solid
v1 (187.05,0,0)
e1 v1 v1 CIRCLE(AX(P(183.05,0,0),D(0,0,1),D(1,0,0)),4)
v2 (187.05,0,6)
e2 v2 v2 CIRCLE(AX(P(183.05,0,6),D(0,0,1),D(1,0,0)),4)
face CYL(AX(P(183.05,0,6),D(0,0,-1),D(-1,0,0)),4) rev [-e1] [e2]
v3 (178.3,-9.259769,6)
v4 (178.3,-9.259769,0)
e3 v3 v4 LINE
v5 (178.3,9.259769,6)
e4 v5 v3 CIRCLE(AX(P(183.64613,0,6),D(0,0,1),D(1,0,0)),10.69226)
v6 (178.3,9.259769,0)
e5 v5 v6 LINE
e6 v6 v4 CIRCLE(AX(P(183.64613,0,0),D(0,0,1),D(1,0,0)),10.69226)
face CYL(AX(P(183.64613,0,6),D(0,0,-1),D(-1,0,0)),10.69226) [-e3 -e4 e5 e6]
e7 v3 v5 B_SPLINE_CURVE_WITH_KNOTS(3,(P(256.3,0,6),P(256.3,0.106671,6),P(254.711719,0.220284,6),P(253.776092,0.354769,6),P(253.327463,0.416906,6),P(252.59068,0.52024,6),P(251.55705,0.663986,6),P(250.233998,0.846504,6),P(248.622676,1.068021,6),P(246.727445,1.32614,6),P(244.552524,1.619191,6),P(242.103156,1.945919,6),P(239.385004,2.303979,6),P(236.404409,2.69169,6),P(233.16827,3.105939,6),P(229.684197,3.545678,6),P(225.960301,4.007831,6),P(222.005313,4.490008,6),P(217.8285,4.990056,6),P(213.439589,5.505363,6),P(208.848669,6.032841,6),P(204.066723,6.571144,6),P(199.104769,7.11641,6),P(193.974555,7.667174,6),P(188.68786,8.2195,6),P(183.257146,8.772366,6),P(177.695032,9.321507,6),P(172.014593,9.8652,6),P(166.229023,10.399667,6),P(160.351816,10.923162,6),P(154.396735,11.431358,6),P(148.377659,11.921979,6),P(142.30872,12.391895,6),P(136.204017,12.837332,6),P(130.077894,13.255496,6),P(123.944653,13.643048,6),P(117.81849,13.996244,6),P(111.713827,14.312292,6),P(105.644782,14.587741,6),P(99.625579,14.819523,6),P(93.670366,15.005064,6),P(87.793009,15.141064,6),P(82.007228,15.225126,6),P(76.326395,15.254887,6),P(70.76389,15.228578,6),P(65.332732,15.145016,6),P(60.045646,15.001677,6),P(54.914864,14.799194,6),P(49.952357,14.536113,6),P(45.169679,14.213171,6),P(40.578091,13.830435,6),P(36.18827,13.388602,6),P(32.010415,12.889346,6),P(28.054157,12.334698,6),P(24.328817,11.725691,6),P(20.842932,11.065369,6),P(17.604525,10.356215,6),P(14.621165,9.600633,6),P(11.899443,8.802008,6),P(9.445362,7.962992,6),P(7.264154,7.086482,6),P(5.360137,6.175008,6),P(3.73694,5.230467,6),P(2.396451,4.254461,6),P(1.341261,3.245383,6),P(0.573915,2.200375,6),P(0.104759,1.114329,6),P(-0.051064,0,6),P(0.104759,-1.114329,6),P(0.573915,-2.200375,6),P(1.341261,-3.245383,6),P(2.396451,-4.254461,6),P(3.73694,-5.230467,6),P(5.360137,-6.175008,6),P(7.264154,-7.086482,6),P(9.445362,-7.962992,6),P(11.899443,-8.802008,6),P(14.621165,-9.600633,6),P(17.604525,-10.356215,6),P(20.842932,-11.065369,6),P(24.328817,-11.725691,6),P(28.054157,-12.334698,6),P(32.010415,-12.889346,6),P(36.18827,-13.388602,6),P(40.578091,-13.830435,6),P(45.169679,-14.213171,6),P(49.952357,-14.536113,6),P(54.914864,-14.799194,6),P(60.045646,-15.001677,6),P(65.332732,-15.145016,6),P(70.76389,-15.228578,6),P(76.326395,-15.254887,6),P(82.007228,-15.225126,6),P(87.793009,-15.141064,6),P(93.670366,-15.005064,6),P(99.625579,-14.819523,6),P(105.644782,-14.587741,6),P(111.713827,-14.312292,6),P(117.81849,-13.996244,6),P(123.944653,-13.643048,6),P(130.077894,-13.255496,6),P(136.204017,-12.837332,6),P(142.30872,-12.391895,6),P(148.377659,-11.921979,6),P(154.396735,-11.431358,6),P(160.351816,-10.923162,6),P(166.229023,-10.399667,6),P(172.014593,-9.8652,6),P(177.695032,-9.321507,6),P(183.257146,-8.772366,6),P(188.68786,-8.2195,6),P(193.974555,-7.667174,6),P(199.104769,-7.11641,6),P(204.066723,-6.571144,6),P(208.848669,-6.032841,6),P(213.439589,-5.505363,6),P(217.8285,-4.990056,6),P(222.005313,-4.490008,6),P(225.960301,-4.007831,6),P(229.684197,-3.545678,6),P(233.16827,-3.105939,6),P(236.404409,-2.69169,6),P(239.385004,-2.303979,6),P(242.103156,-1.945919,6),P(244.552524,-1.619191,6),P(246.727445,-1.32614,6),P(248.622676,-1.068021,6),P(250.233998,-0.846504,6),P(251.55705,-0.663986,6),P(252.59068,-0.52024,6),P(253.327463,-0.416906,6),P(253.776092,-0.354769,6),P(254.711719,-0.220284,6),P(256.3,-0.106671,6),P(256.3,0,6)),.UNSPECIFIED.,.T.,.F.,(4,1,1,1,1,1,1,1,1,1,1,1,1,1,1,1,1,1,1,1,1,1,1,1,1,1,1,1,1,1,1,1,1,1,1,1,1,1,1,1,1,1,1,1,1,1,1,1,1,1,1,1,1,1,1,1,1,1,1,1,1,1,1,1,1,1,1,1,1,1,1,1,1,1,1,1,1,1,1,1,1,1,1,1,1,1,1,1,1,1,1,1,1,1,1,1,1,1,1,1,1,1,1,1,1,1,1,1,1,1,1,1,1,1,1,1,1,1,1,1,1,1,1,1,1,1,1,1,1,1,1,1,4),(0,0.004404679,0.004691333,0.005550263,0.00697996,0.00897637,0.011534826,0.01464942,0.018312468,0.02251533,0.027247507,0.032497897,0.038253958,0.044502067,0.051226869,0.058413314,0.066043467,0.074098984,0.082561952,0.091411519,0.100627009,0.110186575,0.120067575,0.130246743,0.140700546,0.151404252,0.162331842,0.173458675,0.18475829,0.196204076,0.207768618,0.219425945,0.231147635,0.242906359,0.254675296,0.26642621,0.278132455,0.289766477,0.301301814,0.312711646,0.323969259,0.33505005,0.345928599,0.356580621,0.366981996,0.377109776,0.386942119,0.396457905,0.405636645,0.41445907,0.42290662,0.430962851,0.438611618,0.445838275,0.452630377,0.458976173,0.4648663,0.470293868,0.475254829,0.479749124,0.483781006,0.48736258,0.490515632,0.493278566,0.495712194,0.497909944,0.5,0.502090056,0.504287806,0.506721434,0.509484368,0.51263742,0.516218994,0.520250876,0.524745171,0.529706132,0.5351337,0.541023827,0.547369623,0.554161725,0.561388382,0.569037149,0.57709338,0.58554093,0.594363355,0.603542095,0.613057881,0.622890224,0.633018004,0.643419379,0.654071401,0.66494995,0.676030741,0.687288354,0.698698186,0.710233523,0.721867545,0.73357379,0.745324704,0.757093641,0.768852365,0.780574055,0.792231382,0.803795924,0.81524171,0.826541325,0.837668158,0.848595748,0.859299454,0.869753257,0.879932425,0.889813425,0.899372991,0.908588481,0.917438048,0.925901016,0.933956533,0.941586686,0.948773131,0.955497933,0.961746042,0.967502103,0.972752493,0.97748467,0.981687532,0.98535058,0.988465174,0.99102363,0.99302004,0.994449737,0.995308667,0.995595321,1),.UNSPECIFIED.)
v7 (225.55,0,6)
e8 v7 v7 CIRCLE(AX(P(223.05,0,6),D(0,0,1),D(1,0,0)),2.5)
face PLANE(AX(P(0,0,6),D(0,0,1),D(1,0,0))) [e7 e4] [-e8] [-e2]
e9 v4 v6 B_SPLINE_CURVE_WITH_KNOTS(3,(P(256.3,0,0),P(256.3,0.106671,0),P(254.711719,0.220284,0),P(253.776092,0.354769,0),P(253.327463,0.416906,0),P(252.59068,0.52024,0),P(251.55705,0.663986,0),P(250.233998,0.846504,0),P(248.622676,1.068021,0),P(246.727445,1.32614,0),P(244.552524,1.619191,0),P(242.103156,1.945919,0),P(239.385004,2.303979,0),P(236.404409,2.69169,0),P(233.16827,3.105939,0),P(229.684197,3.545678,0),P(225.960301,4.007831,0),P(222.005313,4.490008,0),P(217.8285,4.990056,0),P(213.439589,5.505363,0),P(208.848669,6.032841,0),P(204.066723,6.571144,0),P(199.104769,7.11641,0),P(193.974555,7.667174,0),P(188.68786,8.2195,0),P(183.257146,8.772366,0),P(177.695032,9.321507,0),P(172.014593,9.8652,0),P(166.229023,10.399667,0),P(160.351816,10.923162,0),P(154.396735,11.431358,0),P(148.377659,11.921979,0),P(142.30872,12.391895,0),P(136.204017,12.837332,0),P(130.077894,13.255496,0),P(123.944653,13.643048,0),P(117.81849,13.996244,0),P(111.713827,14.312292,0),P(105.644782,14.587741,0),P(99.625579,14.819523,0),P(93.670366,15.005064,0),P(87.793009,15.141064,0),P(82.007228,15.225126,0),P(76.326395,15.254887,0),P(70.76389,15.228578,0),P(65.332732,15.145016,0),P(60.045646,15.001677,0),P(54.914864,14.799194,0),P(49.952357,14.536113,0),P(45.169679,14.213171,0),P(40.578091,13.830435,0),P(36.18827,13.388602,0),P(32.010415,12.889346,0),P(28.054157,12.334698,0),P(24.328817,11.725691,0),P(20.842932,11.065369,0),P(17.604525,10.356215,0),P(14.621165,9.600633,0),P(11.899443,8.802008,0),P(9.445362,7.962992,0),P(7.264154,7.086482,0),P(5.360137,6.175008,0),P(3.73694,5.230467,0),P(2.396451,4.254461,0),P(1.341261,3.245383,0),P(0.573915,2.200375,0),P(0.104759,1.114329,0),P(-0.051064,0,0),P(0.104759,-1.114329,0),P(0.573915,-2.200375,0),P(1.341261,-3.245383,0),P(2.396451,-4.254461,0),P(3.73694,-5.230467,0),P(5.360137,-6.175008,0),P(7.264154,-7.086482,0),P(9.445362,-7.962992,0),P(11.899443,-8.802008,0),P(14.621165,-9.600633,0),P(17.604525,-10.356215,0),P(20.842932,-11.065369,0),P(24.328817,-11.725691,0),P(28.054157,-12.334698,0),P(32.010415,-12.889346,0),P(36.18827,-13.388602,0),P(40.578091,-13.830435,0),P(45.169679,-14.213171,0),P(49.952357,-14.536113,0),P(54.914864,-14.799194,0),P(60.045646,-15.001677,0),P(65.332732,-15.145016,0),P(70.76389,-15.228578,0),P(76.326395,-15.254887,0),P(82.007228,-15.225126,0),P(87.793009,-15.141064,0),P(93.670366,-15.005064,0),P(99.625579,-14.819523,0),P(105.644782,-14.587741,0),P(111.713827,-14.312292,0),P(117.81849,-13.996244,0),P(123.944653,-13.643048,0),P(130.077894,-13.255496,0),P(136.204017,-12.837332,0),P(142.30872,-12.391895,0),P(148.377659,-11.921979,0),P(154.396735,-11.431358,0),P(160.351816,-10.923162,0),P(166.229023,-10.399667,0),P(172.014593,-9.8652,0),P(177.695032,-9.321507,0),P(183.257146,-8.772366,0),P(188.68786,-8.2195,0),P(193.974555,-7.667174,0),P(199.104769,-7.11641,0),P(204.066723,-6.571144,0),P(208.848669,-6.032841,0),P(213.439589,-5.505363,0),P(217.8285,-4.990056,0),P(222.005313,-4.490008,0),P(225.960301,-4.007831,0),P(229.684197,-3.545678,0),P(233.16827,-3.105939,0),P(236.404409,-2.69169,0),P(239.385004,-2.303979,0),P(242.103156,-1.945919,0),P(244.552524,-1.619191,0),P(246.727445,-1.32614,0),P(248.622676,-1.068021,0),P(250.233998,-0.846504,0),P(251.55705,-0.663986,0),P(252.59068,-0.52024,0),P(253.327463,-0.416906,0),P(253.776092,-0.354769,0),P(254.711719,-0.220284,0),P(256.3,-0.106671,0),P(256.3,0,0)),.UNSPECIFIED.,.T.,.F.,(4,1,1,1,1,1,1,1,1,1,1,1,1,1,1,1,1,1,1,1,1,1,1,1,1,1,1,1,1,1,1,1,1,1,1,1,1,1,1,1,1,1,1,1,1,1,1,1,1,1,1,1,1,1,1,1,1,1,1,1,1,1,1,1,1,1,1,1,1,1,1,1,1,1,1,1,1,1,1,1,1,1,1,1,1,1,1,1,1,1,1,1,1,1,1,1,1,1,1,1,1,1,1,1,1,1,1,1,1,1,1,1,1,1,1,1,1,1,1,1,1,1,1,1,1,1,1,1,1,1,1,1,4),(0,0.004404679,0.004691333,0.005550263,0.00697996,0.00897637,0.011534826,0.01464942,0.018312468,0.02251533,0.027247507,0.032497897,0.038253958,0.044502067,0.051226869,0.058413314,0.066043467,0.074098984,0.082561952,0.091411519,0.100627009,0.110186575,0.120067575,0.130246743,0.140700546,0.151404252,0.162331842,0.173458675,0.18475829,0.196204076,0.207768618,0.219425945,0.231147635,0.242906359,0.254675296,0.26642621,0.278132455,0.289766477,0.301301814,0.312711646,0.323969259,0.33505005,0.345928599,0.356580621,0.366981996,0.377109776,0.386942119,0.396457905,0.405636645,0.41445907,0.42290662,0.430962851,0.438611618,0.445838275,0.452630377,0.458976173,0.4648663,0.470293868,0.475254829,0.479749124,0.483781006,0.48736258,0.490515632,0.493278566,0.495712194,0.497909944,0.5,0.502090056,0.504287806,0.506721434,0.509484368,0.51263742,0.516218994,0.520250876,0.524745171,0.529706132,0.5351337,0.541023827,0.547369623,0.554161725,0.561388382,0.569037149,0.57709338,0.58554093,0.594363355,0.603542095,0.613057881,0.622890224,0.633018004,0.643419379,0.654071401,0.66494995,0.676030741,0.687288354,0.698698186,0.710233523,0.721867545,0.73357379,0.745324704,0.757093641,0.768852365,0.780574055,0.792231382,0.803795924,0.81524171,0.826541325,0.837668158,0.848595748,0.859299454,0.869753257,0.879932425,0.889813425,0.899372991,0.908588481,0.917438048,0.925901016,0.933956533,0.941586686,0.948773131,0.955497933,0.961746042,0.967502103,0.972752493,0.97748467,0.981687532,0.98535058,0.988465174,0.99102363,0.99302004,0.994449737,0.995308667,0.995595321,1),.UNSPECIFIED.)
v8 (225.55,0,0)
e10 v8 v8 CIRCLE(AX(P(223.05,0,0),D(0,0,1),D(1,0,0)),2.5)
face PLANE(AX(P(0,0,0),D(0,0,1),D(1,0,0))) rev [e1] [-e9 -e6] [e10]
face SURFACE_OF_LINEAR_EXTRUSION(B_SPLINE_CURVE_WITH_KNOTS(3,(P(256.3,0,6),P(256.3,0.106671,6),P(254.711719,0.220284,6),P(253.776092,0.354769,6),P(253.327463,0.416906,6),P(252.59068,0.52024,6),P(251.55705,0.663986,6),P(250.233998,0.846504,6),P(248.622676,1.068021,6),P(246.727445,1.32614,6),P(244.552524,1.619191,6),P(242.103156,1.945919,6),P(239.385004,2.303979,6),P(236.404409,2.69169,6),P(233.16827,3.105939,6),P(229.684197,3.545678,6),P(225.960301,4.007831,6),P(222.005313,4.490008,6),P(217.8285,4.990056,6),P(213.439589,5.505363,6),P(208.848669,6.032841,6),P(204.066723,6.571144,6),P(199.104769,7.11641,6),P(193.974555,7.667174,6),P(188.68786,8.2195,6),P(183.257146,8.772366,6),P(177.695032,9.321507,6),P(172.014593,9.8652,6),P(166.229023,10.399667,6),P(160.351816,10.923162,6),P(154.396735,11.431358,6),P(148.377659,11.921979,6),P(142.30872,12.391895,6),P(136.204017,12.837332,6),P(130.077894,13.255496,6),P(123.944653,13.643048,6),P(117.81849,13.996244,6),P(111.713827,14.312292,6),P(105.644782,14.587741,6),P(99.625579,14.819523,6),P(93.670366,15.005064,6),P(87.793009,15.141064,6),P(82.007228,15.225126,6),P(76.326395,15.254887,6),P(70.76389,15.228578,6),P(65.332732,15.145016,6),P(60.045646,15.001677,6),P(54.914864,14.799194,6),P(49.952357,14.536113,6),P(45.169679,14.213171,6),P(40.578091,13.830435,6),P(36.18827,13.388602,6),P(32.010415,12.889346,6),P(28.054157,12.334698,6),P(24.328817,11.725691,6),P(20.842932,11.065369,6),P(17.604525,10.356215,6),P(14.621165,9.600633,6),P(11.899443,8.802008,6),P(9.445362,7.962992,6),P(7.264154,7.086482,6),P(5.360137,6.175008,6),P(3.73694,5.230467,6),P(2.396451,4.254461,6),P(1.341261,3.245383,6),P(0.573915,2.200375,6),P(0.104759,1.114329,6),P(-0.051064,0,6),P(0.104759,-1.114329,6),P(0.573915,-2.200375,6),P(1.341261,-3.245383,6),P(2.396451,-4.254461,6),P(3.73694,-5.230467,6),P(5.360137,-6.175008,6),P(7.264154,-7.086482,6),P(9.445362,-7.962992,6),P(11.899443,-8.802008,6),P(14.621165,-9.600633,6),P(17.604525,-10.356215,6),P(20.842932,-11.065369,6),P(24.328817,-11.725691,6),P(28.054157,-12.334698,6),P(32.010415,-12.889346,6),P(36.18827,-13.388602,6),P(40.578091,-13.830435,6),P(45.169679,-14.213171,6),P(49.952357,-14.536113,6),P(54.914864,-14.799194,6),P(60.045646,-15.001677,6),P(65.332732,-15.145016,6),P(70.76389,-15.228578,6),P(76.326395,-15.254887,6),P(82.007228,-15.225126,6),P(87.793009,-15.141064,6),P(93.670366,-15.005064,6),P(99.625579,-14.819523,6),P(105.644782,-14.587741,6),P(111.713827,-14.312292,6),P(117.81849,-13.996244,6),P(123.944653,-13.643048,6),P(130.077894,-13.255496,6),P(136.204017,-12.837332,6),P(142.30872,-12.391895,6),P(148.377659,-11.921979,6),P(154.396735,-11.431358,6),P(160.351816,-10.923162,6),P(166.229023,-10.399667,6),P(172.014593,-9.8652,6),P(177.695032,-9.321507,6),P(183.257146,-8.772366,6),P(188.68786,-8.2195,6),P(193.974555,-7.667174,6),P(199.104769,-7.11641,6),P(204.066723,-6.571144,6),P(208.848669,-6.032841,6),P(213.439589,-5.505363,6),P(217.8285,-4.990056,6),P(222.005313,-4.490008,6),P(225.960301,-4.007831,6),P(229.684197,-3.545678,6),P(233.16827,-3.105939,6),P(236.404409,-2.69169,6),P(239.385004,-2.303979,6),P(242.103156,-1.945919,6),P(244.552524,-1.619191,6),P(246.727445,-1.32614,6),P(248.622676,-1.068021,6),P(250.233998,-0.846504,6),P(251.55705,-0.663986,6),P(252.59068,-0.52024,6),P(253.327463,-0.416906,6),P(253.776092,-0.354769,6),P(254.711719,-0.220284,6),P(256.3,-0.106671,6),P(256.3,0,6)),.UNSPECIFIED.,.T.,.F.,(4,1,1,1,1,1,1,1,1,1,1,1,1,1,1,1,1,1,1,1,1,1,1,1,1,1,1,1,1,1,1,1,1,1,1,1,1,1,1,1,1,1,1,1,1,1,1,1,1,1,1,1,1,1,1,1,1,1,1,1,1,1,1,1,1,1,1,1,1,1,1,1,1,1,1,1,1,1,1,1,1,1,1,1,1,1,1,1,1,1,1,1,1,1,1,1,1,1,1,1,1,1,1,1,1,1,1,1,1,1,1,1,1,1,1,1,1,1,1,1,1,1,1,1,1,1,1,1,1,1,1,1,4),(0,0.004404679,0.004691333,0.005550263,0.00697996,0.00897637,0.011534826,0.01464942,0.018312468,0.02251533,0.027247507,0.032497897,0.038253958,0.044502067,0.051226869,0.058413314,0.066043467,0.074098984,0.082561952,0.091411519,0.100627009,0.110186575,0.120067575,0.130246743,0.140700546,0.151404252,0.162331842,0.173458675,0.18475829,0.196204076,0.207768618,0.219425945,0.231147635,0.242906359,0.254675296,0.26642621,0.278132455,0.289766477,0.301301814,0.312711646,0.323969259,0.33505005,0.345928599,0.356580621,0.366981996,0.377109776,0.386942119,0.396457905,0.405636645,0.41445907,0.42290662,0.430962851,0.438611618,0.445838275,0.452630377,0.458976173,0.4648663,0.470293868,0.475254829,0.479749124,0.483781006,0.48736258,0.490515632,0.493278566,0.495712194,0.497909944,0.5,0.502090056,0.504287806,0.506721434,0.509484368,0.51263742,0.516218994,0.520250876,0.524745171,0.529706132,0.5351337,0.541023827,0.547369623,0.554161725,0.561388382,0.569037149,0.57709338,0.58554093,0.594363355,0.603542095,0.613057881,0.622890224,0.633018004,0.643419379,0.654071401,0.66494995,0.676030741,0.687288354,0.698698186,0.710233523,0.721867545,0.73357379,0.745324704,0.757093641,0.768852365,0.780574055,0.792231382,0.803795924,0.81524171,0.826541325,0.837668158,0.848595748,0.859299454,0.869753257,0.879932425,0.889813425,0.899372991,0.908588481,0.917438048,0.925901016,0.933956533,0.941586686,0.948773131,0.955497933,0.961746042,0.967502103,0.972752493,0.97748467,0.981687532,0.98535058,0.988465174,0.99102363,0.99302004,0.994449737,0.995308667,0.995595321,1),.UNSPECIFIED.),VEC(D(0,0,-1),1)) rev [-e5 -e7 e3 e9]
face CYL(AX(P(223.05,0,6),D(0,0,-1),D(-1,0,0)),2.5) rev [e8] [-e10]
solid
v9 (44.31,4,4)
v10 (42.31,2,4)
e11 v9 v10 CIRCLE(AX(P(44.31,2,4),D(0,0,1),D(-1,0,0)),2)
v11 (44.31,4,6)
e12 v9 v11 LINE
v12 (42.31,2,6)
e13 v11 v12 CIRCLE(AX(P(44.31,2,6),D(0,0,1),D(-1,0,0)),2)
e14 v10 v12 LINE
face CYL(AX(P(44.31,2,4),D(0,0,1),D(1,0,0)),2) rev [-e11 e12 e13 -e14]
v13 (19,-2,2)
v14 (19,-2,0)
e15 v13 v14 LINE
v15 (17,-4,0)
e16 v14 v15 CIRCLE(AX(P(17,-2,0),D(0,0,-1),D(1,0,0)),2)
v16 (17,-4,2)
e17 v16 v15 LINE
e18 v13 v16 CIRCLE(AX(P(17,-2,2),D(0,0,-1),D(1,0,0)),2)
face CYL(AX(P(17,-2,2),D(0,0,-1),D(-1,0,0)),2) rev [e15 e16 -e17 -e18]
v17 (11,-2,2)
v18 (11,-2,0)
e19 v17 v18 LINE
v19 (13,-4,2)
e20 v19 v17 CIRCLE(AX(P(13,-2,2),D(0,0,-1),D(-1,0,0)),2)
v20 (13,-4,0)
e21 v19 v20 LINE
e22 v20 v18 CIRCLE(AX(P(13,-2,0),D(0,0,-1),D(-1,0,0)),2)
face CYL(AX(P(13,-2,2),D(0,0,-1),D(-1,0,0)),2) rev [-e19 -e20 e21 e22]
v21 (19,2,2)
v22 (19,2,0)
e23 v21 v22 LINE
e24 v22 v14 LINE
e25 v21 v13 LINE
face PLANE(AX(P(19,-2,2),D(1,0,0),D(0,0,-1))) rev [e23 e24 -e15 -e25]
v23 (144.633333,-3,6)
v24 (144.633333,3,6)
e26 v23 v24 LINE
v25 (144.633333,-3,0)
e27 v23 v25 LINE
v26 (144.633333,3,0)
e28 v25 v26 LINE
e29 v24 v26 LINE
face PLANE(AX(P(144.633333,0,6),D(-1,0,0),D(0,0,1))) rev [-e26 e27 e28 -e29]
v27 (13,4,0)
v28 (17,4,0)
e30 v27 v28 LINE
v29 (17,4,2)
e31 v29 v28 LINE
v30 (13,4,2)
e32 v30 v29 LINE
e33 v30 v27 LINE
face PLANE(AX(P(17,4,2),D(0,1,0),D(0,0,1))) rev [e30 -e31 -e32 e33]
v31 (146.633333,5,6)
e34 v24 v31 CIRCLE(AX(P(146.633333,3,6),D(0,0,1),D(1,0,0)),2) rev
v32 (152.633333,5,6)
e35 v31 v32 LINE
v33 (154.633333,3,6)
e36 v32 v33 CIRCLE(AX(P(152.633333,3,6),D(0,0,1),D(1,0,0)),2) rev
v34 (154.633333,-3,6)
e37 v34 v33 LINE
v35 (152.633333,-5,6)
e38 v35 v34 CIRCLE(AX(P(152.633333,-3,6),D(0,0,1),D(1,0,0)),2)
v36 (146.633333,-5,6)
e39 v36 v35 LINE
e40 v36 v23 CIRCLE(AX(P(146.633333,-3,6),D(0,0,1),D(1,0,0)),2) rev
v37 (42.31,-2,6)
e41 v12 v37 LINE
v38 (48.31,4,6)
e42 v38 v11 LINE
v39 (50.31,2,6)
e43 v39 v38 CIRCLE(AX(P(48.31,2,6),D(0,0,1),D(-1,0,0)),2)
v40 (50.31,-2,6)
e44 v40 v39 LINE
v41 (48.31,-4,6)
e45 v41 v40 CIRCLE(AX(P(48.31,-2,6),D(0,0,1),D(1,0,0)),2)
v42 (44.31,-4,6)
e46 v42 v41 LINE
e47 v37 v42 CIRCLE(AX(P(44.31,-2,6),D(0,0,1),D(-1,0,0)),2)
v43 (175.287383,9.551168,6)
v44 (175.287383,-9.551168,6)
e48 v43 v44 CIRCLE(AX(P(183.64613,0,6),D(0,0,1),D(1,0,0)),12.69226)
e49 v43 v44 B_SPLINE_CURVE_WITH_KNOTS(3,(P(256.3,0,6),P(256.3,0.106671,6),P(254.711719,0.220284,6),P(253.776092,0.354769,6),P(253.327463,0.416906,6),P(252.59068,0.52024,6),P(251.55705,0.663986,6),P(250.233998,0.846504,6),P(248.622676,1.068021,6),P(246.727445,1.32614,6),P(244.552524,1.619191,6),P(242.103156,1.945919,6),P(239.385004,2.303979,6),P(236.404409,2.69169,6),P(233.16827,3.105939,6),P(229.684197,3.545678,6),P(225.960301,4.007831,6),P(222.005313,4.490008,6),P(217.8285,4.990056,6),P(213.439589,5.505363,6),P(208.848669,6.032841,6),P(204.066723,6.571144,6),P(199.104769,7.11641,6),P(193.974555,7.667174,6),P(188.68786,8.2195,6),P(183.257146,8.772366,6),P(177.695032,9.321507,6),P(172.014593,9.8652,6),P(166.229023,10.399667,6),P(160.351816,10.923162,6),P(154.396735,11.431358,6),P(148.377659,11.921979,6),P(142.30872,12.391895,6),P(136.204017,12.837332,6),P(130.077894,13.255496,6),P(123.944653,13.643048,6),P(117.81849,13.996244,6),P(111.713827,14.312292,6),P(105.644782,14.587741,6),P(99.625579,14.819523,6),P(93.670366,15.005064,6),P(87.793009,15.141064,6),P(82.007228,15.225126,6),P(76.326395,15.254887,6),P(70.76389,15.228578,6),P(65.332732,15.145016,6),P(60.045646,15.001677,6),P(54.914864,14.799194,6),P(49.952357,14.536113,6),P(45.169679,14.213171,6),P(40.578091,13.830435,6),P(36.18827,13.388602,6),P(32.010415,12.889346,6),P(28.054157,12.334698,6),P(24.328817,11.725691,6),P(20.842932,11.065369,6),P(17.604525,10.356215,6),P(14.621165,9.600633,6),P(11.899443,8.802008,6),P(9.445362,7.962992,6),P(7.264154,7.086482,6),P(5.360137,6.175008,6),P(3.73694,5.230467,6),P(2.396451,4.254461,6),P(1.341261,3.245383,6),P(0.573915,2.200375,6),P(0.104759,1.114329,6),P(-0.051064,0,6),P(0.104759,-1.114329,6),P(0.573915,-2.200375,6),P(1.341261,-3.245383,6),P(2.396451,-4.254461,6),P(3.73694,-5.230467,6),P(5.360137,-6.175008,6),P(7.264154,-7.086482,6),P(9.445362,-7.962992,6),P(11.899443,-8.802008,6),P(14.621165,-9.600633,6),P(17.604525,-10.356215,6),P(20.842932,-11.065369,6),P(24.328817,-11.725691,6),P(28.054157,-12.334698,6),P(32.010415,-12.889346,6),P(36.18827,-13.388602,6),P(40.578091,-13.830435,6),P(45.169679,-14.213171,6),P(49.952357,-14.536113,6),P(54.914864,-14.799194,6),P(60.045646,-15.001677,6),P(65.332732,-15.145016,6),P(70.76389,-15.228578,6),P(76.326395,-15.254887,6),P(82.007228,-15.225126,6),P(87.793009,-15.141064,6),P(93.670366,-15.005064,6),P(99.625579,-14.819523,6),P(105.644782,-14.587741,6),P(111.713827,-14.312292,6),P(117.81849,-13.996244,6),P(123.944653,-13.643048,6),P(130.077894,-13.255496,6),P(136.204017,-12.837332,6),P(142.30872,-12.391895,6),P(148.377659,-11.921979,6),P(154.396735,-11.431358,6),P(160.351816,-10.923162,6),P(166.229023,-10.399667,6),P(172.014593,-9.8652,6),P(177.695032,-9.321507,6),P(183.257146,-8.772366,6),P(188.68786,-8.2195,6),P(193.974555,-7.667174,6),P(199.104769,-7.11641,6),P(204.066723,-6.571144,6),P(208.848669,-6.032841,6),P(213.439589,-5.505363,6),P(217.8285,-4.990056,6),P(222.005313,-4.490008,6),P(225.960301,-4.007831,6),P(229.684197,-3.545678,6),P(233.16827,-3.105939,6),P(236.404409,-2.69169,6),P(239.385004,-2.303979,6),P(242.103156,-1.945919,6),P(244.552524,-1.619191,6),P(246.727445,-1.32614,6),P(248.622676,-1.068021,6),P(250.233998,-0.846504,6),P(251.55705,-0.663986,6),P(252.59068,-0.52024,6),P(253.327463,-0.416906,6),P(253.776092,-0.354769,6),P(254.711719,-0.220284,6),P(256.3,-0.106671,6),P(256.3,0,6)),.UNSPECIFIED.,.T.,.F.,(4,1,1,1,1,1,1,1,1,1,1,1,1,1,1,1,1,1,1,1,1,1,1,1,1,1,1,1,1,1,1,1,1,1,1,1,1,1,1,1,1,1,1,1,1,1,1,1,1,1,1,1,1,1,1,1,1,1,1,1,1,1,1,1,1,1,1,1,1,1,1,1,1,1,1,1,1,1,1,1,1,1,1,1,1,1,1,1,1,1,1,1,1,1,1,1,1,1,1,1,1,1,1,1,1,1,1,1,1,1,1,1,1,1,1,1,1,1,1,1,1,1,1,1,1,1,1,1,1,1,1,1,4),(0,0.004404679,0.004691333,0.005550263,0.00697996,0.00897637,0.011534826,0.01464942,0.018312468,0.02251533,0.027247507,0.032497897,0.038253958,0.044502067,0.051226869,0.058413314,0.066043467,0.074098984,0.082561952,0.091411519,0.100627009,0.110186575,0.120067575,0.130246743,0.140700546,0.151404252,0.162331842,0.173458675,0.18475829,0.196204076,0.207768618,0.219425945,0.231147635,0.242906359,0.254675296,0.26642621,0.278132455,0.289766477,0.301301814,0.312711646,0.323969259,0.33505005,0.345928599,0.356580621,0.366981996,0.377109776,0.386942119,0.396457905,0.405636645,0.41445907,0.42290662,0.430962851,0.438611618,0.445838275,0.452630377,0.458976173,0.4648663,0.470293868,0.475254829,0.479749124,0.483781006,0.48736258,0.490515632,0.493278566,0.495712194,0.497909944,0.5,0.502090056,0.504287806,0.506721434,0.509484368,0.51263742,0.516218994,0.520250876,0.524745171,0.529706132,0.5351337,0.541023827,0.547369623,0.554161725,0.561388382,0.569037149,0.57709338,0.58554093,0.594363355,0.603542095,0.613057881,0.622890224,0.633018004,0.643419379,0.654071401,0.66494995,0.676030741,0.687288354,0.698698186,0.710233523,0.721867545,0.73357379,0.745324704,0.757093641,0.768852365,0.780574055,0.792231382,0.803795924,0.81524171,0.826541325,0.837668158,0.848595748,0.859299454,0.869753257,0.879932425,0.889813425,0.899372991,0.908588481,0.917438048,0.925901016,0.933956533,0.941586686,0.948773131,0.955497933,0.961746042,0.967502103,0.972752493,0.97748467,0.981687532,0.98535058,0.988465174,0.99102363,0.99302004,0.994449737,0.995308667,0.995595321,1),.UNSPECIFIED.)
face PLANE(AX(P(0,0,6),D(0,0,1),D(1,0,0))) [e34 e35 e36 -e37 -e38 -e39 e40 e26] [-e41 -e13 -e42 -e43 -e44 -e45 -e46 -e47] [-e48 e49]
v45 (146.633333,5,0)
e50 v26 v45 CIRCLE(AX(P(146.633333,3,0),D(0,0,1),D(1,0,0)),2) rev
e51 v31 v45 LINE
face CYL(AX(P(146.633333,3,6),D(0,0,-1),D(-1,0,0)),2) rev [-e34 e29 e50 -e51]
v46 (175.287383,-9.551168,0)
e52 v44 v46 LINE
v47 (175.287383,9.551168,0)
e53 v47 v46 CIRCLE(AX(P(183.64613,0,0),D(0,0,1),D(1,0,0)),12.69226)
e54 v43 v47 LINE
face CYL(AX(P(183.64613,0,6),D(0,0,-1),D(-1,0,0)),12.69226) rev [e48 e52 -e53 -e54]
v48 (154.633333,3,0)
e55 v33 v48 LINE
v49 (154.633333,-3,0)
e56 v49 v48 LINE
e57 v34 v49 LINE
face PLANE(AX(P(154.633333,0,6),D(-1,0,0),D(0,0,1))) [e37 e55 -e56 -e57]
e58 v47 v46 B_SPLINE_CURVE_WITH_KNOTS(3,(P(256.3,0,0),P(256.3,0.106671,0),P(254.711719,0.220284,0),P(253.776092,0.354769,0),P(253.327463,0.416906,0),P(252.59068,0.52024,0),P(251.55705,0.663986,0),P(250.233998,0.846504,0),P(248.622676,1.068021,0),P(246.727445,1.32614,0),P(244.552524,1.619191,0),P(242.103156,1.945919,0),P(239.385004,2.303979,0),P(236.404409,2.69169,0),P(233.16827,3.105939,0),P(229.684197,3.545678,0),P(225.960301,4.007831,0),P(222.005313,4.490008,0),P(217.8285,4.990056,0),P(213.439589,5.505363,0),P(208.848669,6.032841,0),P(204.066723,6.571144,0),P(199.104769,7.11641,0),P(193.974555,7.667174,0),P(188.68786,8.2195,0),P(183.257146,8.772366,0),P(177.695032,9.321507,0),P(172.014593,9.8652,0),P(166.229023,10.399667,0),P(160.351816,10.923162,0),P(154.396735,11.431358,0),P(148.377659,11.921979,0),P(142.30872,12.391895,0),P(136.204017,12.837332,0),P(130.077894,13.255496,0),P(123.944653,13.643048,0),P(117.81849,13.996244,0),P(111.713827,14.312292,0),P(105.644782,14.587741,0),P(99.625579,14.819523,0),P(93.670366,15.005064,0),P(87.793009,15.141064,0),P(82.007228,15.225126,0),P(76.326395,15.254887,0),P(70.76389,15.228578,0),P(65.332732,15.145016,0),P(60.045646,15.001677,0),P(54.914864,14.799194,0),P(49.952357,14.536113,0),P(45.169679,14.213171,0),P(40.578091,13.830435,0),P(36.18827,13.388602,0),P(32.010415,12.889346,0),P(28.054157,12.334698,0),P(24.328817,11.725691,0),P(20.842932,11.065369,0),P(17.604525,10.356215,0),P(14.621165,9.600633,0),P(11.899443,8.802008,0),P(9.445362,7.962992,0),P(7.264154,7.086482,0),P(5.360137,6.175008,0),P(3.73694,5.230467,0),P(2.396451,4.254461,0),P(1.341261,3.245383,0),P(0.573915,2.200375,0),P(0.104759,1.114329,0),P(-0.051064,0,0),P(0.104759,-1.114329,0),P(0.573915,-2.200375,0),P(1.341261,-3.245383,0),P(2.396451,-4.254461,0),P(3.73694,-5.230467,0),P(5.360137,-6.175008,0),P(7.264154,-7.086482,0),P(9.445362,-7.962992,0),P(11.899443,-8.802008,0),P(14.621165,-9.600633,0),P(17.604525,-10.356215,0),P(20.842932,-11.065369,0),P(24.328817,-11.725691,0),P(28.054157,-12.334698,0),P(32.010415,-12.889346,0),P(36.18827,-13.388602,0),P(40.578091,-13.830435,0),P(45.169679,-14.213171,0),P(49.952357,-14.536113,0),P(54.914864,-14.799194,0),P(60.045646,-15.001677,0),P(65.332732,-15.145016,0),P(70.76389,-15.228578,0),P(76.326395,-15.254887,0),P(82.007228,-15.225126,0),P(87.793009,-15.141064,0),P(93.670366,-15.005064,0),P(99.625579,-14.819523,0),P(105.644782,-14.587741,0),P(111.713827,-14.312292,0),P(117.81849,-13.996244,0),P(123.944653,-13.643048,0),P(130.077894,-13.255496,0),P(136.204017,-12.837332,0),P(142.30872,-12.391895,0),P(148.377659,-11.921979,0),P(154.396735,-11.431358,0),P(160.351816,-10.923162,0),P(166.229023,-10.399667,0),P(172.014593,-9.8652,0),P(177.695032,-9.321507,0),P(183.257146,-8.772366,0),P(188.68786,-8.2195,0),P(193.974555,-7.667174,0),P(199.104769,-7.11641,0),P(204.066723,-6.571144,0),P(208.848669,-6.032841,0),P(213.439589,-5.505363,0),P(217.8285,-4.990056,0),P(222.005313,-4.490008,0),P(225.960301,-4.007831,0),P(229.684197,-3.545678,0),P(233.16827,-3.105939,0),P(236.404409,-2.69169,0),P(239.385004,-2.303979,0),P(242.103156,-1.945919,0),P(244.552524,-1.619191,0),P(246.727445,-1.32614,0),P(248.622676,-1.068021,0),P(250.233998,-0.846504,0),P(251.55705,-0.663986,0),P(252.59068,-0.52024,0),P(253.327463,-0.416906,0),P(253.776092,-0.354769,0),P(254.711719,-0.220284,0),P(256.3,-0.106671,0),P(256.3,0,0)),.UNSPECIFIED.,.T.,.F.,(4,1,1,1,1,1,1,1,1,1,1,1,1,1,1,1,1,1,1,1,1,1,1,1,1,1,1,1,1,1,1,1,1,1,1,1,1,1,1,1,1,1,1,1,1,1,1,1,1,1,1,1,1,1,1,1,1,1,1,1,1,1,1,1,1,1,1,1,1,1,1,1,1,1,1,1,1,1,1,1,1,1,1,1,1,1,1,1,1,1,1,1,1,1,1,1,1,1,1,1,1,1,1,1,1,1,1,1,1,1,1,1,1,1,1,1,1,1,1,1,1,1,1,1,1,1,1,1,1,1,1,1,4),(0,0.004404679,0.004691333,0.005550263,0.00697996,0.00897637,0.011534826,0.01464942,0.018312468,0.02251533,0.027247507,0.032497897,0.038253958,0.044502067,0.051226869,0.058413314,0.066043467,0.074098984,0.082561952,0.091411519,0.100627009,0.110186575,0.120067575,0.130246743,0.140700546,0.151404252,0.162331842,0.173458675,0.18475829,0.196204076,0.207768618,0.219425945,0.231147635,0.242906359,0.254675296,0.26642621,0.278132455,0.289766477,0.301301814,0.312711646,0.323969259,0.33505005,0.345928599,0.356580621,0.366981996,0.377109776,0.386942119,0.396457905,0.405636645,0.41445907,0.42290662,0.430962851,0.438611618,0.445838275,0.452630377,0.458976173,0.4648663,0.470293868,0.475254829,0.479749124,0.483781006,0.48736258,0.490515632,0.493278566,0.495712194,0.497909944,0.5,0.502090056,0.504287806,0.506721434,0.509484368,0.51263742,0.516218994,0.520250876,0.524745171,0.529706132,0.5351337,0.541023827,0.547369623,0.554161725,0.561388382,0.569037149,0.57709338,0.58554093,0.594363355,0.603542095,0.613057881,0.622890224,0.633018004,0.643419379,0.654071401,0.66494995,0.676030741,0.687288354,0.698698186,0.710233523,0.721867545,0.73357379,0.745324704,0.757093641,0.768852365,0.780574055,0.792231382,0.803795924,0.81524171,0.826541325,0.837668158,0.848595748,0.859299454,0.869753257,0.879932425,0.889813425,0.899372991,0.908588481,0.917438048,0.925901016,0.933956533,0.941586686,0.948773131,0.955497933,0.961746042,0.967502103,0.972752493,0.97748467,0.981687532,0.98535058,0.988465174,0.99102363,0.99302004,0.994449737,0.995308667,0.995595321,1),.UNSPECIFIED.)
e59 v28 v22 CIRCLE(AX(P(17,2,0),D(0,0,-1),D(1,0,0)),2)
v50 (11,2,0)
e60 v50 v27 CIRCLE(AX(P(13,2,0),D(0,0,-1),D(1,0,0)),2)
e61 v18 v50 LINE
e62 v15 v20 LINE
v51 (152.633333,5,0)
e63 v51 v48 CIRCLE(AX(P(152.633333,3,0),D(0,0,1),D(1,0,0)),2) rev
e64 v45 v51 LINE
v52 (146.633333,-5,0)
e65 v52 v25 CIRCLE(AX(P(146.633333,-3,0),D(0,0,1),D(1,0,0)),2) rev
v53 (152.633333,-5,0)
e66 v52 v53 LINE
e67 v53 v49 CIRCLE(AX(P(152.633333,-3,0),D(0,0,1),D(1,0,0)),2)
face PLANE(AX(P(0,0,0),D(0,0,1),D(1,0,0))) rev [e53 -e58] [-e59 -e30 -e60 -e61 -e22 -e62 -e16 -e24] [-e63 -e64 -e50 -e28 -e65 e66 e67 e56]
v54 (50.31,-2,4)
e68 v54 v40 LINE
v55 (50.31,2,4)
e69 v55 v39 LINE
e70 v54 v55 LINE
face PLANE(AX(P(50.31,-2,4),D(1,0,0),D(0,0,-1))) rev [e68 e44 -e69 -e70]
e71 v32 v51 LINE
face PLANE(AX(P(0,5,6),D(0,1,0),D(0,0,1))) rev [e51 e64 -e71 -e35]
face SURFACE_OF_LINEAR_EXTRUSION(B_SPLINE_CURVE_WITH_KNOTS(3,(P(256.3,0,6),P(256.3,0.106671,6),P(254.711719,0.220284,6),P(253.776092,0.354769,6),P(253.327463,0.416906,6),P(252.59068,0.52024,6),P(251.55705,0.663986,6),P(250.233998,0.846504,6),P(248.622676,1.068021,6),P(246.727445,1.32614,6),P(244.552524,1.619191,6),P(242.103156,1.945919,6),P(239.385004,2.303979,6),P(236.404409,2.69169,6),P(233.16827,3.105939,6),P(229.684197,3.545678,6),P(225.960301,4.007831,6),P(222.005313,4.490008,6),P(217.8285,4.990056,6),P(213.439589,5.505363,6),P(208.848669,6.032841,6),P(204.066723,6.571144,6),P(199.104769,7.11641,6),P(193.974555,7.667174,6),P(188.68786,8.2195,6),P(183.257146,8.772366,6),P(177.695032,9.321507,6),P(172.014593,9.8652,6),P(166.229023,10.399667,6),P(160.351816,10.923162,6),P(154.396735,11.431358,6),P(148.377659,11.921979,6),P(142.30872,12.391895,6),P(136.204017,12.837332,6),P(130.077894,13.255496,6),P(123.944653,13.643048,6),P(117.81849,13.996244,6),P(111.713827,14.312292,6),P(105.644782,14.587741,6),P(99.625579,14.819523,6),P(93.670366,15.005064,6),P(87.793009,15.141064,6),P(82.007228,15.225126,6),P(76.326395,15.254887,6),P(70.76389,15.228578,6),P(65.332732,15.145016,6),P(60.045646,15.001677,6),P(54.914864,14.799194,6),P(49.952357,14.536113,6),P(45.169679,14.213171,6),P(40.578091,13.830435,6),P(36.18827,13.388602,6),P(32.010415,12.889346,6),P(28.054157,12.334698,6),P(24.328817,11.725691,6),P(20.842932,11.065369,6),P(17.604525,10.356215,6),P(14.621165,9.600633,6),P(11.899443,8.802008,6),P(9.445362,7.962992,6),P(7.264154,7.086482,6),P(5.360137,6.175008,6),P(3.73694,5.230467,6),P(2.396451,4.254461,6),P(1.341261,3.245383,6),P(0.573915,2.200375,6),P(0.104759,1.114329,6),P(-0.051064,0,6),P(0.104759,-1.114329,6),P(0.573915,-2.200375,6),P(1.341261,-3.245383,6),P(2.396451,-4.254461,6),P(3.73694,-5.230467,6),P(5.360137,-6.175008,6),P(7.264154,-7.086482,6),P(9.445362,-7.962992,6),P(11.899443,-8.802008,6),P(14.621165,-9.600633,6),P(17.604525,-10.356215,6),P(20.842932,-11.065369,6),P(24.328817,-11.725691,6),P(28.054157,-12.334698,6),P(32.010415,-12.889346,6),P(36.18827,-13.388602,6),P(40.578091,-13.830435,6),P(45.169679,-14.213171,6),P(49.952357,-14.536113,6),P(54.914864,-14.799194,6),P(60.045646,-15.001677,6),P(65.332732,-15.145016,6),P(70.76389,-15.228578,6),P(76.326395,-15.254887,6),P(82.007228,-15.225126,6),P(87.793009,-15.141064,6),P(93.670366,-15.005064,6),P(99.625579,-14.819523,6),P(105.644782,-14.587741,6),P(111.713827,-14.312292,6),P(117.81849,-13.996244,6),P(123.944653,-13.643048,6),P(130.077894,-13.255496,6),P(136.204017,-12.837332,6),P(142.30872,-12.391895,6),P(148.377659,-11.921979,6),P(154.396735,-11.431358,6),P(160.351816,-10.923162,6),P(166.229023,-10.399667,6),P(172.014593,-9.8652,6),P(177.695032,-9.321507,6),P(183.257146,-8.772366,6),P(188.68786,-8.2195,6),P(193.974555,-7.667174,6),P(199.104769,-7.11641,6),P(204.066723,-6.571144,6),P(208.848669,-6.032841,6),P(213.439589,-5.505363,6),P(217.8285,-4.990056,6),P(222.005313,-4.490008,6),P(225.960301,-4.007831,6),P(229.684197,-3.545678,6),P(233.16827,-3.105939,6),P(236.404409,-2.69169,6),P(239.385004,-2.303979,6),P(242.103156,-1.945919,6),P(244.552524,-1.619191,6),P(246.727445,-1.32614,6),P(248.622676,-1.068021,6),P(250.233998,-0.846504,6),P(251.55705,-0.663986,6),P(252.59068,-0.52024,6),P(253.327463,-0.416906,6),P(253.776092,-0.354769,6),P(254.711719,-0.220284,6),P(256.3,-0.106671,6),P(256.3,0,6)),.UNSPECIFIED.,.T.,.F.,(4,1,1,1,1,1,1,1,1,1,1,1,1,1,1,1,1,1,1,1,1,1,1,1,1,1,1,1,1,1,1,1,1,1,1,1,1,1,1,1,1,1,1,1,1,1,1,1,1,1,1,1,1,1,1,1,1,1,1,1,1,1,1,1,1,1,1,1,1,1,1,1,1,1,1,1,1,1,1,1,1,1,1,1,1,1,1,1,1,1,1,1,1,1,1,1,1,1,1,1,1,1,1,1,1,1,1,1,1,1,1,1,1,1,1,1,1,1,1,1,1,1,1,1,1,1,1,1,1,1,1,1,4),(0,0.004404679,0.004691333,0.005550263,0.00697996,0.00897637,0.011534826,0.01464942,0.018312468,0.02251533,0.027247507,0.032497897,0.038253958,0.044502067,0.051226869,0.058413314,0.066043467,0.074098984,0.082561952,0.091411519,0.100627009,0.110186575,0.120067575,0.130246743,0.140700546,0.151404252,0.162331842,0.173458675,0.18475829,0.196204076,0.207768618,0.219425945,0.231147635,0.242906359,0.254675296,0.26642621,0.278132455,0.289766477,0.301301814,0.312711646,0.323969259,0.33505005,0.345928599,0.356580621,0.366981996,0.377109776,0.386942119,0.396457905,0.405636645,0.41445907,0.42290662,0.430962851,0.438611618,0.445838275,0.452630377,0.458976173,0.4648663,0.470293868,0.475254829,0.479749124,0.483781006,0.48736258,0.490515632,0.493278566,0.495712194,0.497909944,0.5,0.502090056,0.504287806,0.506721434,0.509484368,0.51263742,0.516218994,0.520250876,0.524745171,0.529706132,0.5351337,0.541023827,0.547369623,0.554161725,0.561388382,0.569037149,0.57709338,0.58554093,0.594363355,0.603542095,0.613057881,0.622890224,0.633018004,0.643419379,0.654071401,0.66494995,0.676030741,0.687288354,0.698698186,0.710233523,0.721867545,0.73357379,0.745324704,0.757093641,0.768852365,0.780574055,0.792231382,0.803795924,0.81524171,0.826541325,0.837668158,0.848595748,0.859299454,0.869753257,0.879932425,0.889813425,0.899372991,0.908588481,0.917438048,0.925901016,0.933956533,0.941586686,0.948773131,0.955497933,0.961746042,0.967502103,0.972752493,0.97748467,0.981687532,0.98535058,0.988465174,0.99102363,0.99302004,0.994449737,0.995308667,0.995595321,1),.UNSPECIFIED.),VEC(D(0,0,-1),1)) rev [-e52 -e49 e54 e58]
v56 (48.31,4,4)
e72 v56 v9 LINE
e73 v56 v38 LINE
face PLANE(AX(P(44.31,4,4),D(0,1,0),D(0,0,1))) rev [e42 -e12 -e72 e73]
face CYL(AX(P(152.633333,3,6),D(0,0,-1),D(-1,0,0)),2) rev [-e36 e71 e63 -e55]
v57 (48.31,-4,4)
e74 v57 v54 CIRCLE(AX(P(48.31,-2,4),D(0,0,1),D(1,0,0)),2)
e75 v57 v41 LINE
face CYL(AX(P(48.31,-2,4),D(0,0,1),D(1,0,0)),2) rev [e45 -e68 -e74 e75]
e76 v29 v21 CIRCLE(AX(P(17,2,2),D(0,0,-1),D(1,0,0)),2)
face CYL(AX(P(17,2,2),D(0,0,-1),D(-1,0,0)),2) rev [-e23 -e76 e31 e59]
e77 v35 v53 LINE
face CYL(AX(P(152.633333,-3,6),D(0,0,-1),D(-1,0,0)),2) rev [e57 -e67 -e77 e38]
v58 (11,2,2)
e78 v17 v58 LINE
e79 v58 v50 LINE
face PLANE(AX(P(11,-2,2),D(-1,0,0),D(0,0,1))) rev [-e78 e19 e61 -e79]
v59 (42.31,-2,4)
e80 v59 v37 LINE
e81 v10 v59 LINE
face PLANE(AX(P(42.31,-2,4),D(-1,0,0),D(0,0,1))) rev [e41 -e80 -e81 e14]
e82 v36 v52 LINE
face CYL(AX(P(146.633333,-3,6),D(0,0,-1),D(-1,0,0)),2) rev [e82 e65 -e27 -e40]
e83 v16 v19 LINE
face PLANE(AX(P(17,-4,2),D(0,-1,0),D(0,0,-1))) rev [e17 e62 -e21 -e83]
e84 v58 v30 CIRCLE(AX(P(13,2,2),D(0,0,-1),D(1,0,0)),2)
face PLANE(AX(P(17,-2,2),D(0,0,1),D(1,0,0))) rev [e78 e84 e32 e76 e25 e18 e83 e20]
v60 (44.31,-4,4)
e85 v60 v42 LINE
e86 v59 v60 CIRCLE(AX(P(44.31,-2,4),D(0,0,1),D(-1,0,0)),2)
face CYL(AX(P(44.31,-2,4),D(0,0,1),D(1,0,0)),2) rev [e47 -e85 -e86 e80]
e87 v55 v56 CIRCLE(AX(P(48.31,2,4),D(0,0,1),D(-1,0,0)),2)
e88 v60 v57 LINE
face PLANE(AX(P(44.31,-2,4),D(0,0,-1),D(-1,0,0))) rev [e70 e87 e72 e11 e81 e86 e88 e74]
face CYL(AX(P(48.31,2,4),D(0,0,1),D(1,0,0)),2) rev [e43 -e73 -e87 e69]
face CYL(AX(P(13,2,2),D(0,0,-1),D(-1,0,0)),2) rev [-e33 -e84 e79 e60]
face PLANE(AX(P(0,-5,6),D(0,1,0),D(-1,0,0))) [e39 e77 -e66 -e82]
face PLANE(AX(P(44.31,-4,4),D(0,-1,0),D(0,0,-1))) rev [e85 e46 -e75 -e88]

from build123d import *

# Parameters (mm, degrees)
RESSALTO_EXTRUS_O1_OUTLINE_R   = 4
RESSALTO_EXTRUS_O1_OUTLINE_R_2 = 2.5
RESSALTO_EXTRUS_O1_DEPTH       = 6
CORTE_EXTRUS_O1_DEPTH          = 2
CORTE_EXTRUS_O2_DEPTH          = 2


# Read off the part's stored shape, not the designer's step: Ressalto-extrusão1
with BuildPart() as part:
    # Ressalto-extrusão1 outline → Ressalto-extrusão1 (new body)
    # profile 1 of 2: a face of its own
    with BuildSketch(Plane.XY):
        with BuildLine():
            ThreePointArc((178.3, 9.259768845), (172.953869965, 0), (178.3, -9.259768845))
            add(Edge.make_bspline(
                [(178.3, -9.259768845), (179.966948912, -9.097173464), (183.445872321, -8.753152805), (188.68785969, -8.21950013), (193.974554518, -7.66717356), (199.104769106, -7.11640957), (204.066722569, -6.571144014), (208.848668706, -6.032841378), (213.439589199, -5.505363168), (217.828500467, -4.990056498), (222.005313283, -4.490008279), (225.960300672, -4.007831381), (229.68419663, -3.545678166), (233.168269855, -3.105938896), (236.40440925, -2.691690119), (239.385003595, -2.303979488), (242.103156271, -1.945919059), (244.552524456, -1.619190737), (246.727445017, -1.32614033), (248.622675623, -1.068020882), (250.233997703, -0.846504296), (251.557050419, -0.663986384), (252.590679655, -0.520240199), (253.327462597, -0.416906365), (253.776091936, -0.354769376), (254.711719333, -0.220284067), (256.3, -0.106670993), (256.3, 0), (256.3, 0.106670993), (254.711719333, 0.220284067), (253.776091936, 0.354769376), (253.327462597, 0.416906365), (252.590679655, 0.520240199), (251.557050419, 0.663986384), (250.233997703, 0.846504296), (248.622675623, 1.068020882), (246.727445017, 1.32614033), (244.552524456, 1.619190737), (242.103156271, 1.945919059), (239.385003595, 2.303979488), (236.40440925, 2.691690119), (233.168269855, 3.105938896), (229.68419663, 3.545678166), (225.960300672, 4.007831381), (222.005313283, 4.490008279), (217.828500467, 4.990056498), (213.439589199, 5.505363168), (208.848668706, 6.032841378), (204.066722569, 6.571144014), (199.104769106, 7.11640957), (193.974554518, 7.66717356), (188.68785969, 8.21950013), (183.445872321, 8.753152805), (179.966948912, 9.097173464), (178.3, 9.259768845)],
                knots=[0.849684747, 0.849684747, 0.849684747, 0.849684747, 0.859299454, 0.869753257, 0.879932425, 0.889813425, 0.899372991, 0.908588481, 0.917438048, 0.925901016, 0.933956533, 0.941586686, 0.948773131, 0.955497933, 0.961746042, 0.967502103, 0.972752493, 0.97748467, 0.981687532, 0.98535058, 0.988465174, 0.99102363, 0.99302004, 0.994449737, 0.995308667, 0.995595321, 1, 1, 1, 1.004404679, 1.004691333, 1.005550263, 1.00697996, 1.00897637, 1.011534826, 1.01464942, 1.018312468, 1.02251533, 1.027247507, 1.032497897, 1.038253958, 1.044502067, 1.051226869, 1.058413314, 1.066043467, 1.074098984, 1.082561952, 1.091411519, 1.100627009, 1.110186575, 1.120067575, 1.130246743, 1.140700546, 1.150315253, 1.150315253, 1.150315253, 1.150315253], degree=3))
        make_face()
        with Locations((183.05, 0)):
            Circle(RESSALTO_EXTRUS_O1_OUTLINE_R, mode=Mode.SUBTRACT)
        with Locations((223.05, 0)):
            Circle(RESSALTO_EXTRUS_O1_OUTLINE_R_2, mode=Mode.SUBTRACT)
    # profile 2 of 2: a face of its own
    with BuildSketch(Plane.XY):
        with BuildLine():
            add(Edge.make_bspline(
                [(175.287382607, 9.551167841), (174.207965209, 9.654685452), (171.198874041, 9.940555484), (166.229022592, 10.399667358), (160.351815772, 10.923162493), (154.396735285, 11.431357512), (148.377658827, 11.921979348), (142.308720286, 12.391894821), (136.204016556, 12.837331642), (130.077893929, 13.255496113), (123.944653006, 13.643047983), (117.818490267, 13.996244432), (111.713827177, 14.312292337), (105.64478211, 14.587741364), (99.625579188, 14.819523055), (93.670366494, 15.005064191), (87.793008994, 15.141064398), (82.007227866, 15.225126103), (76.326395242, 15.254886657), (70.763890367, 15.22857762), (65.332731596, 15.145016118), (60.045645868, 15.001676848), (54.914863551, 14.79919411), (49.952356648, 14.536113044), (45.169678516, 14.213170989), (40.57809127, 13.830435299), (36.188270081, 13.388601619), (32.010414838, 12.889346003), (28.054157141, 12.334697787), (24.328816977, 11.725690904), (20.842932132, 11.065369069), (17.604525309, 10.356215177), (14.621164931, 9.600633189), (11.899443292, 8.802008), (9.445361787, 7.962991828), (7.264153877, 7.086482459), (5.360137362, 6.175008453), (3.736939642, 5.230467455), (2.396450862, 4.254460648), (1.341261213, 3.245382554), (0.573915311, 2.200374626), (0.104758816, 1.114328986), (-0.051063833, 0), (0.104758816, -1.114328986), (0.573915311, -2.200374626), (1.341261213, -3.245382554), (2.396450862, -4.254460648), (3.736939642, -5.230467455), (5.360137362, -6.175008453), (7.264153877, -7.086482459), (9.445361787, -7.962991828), (11.899443292, -8.802008), (14.621164931, -9.600633189), (17.604525309, -10.356215177), (20.842932132, -11.065369069), (24.328816977, -11.725690904), (28.054157141, -12.334697787), (32.010414838, -12.889346003), (36.188270081, -13.388601619), (40.57809127, -13.830435299), (45.169678516, -14.213170989), (49.952356648, -14.536113044), (54.914863551, -14.79919411), (60.045645868, -15.001676848), (65.332731596, -15.145016118), (70.763890367, -15.22857762), (76.326395242, -15.254886657), (82.007227866, -15.225126103), (87.793008994, -15.141064398), (93.670366494, -15.005064191), (99.625579188, -14.819523055), (105.64478211, -14.587741364), (111.713827177, -14.312292337), (117.818490267, -13.996244432), (123.944653006, -13.643047983), (130.077893929, -13.255496113), (136.204016556, -12.837331642), (142.308720286, -12.391894821), (148.377658827, -11.921979348), (154.396735285, -11.431357512), (160.351815772, -10.923162493), (166.229022592, -10.399667358), (171.198874041, -9.940555484), (174.207965209, -9.654685452), (175.287382607, -9.551167841)],
                knots=[0.156106905, 0.156106905, 0.156106905, 0.156106905, 0.162331842, 0.173458675, 0.18475829, 0.196204076, 0.207768618, 0.219425945, 0.231147635, 0.242906359, 0.254675296, 0.26642621, 0.278132455, 0.289766477, 0.301301814, 0.312711646, 0.323969259, 0.33505005, 0.345928599, 0.356580621, 0.366981996, 0.377109776, 0.386942119, 0.396457905, 0.405636645, 0.41445907, 0.42290662, 0.430962851, 0.438611618, 0.445838275, 0.452630377, 0.458976173, 0.4648663, 0.470293868, 0.475254829, 0.479749124, 0.483781006, 0.48736258, 0.490515632, 0.493278566, 0.495712194, 0.497909944, 0.5, 0.502090056, 0.504287806, 0.506721434, 0.509484368, 0.51263742, 0.516218994, 0.520250876, 0.524745171, 0.529706132, 0.5351337, 0.541023827, 0.547369623, 0.554161725, 0.561388382, 0.569037149, 0.57709338, 0.58554093, 0.594363355, 0.603542095, 0.613057881, 0.622890224, 0.633018004, 0.643419379, 0.654071401, 0.66494995, 0.676030741, 0.687288354, 0.698698186, 0.710233523, 0.721867545, 0.73357379, 0.745324704, 0.757093641, 0.768852365, 0.780574055, 0.792231382, 0.803795924, 0.81524171, 0.826541325, 0.837668158, 0.843893095, 0.843893095, 0.843893095, 0.843893095], degree=3))
            ThreePointArc((175.287382607, -9.551167841), (170.953869965, 0), (175.287382607, 9.551167841))
        make_face()
        with BuildLine():
            Line((144.63333333, -3), (144.63333333, 3))
            ThreePointArc((144.63333333, 3), (145.219119768, 4.414213562), (146.63333333, 5))
            Line((146.63333333, 5), (152.63333333, 5))
            ThreePointArc((152.63333333, 5), (154.047546892, 4.414213562), (154.63333333, 3))
            Line((154.63333333, 3), (154.63333333, -3))
            ThreePointArc((154.63333333, -3), (154.047546892, -4.414213562), (152.63333333, -5))
            Line((152.63333333, -5), (146.63333333, -5))
            ThreePointArc((146.63333333, -5), (145.219119768, -4.414213562), (144.63333333, -3))
        make_face(mode=Mode.SUBTRACT)
    extrude(amount=RESSALTO_EXTRUS_O1_DEPTH)

    # Esboço3 → Corte-extrusão1 (cut)
    with BuildSketch(Plane(origin=(0, 0, 0), x_dir=(-1, 0, 0), z_dir=(0, 0, -1))):
        with BuildLine():
            Line((-17, -4), (-13, -4))
            ThreePointArc((-13, -4), (-11.585786438, -3.414213562), (-11, -2))
            Line((-11, -2), (-11, 2))
            ThreePointArc((-11, 2), (-11.585786438, 3.414213562), (-13, 4))
            Line((-13, 4), (-17, 4))
            ThreePointArc((-17, 4), (-18.414213562, 3.414213562), (-19, 2))
            Line((-19, 2), (-19, -2))
            ThreePointArc((-19, -2), (-18.414213562, -3.414213562), (-17, -4))
        make_face()
    extrude(amount=-CORTE_EXTRUS_O1_DEPTH, mode=Mode.SUBTRACT)

    # Esboço4 → Corte-extrusão2 (cut)
    with BuildSketch(Plane.XY.offset(6)):
        with BuildLine():
            Line((44.31, -4), (48.31, -4))
            ThreePointArc((48.31, -4), (49.724213562, -3.414213562), (50.31, -2))
            Line((50.31, -2), (50.31, 2))
            ThreePointArc((50.31, 2), (49.724213562, 3.414213562), (48.31, 4))
            Line((48.31, 4), (44.31, 4))
            ThreePointArc((44.31, 4), (42.895786438, 3.414213562), (42.31, 2))
            Line((42.31, 2), (42.31, -2))
            ThreePointArc((42.31, -2), (42.895786438, -3.414213562), (44.31, -4))
        make_face()
    extrude(amount=-CORTE_EXTRUS_O2_DEPTH, mode=Mode.SUBTRACT)


solid = part.part
